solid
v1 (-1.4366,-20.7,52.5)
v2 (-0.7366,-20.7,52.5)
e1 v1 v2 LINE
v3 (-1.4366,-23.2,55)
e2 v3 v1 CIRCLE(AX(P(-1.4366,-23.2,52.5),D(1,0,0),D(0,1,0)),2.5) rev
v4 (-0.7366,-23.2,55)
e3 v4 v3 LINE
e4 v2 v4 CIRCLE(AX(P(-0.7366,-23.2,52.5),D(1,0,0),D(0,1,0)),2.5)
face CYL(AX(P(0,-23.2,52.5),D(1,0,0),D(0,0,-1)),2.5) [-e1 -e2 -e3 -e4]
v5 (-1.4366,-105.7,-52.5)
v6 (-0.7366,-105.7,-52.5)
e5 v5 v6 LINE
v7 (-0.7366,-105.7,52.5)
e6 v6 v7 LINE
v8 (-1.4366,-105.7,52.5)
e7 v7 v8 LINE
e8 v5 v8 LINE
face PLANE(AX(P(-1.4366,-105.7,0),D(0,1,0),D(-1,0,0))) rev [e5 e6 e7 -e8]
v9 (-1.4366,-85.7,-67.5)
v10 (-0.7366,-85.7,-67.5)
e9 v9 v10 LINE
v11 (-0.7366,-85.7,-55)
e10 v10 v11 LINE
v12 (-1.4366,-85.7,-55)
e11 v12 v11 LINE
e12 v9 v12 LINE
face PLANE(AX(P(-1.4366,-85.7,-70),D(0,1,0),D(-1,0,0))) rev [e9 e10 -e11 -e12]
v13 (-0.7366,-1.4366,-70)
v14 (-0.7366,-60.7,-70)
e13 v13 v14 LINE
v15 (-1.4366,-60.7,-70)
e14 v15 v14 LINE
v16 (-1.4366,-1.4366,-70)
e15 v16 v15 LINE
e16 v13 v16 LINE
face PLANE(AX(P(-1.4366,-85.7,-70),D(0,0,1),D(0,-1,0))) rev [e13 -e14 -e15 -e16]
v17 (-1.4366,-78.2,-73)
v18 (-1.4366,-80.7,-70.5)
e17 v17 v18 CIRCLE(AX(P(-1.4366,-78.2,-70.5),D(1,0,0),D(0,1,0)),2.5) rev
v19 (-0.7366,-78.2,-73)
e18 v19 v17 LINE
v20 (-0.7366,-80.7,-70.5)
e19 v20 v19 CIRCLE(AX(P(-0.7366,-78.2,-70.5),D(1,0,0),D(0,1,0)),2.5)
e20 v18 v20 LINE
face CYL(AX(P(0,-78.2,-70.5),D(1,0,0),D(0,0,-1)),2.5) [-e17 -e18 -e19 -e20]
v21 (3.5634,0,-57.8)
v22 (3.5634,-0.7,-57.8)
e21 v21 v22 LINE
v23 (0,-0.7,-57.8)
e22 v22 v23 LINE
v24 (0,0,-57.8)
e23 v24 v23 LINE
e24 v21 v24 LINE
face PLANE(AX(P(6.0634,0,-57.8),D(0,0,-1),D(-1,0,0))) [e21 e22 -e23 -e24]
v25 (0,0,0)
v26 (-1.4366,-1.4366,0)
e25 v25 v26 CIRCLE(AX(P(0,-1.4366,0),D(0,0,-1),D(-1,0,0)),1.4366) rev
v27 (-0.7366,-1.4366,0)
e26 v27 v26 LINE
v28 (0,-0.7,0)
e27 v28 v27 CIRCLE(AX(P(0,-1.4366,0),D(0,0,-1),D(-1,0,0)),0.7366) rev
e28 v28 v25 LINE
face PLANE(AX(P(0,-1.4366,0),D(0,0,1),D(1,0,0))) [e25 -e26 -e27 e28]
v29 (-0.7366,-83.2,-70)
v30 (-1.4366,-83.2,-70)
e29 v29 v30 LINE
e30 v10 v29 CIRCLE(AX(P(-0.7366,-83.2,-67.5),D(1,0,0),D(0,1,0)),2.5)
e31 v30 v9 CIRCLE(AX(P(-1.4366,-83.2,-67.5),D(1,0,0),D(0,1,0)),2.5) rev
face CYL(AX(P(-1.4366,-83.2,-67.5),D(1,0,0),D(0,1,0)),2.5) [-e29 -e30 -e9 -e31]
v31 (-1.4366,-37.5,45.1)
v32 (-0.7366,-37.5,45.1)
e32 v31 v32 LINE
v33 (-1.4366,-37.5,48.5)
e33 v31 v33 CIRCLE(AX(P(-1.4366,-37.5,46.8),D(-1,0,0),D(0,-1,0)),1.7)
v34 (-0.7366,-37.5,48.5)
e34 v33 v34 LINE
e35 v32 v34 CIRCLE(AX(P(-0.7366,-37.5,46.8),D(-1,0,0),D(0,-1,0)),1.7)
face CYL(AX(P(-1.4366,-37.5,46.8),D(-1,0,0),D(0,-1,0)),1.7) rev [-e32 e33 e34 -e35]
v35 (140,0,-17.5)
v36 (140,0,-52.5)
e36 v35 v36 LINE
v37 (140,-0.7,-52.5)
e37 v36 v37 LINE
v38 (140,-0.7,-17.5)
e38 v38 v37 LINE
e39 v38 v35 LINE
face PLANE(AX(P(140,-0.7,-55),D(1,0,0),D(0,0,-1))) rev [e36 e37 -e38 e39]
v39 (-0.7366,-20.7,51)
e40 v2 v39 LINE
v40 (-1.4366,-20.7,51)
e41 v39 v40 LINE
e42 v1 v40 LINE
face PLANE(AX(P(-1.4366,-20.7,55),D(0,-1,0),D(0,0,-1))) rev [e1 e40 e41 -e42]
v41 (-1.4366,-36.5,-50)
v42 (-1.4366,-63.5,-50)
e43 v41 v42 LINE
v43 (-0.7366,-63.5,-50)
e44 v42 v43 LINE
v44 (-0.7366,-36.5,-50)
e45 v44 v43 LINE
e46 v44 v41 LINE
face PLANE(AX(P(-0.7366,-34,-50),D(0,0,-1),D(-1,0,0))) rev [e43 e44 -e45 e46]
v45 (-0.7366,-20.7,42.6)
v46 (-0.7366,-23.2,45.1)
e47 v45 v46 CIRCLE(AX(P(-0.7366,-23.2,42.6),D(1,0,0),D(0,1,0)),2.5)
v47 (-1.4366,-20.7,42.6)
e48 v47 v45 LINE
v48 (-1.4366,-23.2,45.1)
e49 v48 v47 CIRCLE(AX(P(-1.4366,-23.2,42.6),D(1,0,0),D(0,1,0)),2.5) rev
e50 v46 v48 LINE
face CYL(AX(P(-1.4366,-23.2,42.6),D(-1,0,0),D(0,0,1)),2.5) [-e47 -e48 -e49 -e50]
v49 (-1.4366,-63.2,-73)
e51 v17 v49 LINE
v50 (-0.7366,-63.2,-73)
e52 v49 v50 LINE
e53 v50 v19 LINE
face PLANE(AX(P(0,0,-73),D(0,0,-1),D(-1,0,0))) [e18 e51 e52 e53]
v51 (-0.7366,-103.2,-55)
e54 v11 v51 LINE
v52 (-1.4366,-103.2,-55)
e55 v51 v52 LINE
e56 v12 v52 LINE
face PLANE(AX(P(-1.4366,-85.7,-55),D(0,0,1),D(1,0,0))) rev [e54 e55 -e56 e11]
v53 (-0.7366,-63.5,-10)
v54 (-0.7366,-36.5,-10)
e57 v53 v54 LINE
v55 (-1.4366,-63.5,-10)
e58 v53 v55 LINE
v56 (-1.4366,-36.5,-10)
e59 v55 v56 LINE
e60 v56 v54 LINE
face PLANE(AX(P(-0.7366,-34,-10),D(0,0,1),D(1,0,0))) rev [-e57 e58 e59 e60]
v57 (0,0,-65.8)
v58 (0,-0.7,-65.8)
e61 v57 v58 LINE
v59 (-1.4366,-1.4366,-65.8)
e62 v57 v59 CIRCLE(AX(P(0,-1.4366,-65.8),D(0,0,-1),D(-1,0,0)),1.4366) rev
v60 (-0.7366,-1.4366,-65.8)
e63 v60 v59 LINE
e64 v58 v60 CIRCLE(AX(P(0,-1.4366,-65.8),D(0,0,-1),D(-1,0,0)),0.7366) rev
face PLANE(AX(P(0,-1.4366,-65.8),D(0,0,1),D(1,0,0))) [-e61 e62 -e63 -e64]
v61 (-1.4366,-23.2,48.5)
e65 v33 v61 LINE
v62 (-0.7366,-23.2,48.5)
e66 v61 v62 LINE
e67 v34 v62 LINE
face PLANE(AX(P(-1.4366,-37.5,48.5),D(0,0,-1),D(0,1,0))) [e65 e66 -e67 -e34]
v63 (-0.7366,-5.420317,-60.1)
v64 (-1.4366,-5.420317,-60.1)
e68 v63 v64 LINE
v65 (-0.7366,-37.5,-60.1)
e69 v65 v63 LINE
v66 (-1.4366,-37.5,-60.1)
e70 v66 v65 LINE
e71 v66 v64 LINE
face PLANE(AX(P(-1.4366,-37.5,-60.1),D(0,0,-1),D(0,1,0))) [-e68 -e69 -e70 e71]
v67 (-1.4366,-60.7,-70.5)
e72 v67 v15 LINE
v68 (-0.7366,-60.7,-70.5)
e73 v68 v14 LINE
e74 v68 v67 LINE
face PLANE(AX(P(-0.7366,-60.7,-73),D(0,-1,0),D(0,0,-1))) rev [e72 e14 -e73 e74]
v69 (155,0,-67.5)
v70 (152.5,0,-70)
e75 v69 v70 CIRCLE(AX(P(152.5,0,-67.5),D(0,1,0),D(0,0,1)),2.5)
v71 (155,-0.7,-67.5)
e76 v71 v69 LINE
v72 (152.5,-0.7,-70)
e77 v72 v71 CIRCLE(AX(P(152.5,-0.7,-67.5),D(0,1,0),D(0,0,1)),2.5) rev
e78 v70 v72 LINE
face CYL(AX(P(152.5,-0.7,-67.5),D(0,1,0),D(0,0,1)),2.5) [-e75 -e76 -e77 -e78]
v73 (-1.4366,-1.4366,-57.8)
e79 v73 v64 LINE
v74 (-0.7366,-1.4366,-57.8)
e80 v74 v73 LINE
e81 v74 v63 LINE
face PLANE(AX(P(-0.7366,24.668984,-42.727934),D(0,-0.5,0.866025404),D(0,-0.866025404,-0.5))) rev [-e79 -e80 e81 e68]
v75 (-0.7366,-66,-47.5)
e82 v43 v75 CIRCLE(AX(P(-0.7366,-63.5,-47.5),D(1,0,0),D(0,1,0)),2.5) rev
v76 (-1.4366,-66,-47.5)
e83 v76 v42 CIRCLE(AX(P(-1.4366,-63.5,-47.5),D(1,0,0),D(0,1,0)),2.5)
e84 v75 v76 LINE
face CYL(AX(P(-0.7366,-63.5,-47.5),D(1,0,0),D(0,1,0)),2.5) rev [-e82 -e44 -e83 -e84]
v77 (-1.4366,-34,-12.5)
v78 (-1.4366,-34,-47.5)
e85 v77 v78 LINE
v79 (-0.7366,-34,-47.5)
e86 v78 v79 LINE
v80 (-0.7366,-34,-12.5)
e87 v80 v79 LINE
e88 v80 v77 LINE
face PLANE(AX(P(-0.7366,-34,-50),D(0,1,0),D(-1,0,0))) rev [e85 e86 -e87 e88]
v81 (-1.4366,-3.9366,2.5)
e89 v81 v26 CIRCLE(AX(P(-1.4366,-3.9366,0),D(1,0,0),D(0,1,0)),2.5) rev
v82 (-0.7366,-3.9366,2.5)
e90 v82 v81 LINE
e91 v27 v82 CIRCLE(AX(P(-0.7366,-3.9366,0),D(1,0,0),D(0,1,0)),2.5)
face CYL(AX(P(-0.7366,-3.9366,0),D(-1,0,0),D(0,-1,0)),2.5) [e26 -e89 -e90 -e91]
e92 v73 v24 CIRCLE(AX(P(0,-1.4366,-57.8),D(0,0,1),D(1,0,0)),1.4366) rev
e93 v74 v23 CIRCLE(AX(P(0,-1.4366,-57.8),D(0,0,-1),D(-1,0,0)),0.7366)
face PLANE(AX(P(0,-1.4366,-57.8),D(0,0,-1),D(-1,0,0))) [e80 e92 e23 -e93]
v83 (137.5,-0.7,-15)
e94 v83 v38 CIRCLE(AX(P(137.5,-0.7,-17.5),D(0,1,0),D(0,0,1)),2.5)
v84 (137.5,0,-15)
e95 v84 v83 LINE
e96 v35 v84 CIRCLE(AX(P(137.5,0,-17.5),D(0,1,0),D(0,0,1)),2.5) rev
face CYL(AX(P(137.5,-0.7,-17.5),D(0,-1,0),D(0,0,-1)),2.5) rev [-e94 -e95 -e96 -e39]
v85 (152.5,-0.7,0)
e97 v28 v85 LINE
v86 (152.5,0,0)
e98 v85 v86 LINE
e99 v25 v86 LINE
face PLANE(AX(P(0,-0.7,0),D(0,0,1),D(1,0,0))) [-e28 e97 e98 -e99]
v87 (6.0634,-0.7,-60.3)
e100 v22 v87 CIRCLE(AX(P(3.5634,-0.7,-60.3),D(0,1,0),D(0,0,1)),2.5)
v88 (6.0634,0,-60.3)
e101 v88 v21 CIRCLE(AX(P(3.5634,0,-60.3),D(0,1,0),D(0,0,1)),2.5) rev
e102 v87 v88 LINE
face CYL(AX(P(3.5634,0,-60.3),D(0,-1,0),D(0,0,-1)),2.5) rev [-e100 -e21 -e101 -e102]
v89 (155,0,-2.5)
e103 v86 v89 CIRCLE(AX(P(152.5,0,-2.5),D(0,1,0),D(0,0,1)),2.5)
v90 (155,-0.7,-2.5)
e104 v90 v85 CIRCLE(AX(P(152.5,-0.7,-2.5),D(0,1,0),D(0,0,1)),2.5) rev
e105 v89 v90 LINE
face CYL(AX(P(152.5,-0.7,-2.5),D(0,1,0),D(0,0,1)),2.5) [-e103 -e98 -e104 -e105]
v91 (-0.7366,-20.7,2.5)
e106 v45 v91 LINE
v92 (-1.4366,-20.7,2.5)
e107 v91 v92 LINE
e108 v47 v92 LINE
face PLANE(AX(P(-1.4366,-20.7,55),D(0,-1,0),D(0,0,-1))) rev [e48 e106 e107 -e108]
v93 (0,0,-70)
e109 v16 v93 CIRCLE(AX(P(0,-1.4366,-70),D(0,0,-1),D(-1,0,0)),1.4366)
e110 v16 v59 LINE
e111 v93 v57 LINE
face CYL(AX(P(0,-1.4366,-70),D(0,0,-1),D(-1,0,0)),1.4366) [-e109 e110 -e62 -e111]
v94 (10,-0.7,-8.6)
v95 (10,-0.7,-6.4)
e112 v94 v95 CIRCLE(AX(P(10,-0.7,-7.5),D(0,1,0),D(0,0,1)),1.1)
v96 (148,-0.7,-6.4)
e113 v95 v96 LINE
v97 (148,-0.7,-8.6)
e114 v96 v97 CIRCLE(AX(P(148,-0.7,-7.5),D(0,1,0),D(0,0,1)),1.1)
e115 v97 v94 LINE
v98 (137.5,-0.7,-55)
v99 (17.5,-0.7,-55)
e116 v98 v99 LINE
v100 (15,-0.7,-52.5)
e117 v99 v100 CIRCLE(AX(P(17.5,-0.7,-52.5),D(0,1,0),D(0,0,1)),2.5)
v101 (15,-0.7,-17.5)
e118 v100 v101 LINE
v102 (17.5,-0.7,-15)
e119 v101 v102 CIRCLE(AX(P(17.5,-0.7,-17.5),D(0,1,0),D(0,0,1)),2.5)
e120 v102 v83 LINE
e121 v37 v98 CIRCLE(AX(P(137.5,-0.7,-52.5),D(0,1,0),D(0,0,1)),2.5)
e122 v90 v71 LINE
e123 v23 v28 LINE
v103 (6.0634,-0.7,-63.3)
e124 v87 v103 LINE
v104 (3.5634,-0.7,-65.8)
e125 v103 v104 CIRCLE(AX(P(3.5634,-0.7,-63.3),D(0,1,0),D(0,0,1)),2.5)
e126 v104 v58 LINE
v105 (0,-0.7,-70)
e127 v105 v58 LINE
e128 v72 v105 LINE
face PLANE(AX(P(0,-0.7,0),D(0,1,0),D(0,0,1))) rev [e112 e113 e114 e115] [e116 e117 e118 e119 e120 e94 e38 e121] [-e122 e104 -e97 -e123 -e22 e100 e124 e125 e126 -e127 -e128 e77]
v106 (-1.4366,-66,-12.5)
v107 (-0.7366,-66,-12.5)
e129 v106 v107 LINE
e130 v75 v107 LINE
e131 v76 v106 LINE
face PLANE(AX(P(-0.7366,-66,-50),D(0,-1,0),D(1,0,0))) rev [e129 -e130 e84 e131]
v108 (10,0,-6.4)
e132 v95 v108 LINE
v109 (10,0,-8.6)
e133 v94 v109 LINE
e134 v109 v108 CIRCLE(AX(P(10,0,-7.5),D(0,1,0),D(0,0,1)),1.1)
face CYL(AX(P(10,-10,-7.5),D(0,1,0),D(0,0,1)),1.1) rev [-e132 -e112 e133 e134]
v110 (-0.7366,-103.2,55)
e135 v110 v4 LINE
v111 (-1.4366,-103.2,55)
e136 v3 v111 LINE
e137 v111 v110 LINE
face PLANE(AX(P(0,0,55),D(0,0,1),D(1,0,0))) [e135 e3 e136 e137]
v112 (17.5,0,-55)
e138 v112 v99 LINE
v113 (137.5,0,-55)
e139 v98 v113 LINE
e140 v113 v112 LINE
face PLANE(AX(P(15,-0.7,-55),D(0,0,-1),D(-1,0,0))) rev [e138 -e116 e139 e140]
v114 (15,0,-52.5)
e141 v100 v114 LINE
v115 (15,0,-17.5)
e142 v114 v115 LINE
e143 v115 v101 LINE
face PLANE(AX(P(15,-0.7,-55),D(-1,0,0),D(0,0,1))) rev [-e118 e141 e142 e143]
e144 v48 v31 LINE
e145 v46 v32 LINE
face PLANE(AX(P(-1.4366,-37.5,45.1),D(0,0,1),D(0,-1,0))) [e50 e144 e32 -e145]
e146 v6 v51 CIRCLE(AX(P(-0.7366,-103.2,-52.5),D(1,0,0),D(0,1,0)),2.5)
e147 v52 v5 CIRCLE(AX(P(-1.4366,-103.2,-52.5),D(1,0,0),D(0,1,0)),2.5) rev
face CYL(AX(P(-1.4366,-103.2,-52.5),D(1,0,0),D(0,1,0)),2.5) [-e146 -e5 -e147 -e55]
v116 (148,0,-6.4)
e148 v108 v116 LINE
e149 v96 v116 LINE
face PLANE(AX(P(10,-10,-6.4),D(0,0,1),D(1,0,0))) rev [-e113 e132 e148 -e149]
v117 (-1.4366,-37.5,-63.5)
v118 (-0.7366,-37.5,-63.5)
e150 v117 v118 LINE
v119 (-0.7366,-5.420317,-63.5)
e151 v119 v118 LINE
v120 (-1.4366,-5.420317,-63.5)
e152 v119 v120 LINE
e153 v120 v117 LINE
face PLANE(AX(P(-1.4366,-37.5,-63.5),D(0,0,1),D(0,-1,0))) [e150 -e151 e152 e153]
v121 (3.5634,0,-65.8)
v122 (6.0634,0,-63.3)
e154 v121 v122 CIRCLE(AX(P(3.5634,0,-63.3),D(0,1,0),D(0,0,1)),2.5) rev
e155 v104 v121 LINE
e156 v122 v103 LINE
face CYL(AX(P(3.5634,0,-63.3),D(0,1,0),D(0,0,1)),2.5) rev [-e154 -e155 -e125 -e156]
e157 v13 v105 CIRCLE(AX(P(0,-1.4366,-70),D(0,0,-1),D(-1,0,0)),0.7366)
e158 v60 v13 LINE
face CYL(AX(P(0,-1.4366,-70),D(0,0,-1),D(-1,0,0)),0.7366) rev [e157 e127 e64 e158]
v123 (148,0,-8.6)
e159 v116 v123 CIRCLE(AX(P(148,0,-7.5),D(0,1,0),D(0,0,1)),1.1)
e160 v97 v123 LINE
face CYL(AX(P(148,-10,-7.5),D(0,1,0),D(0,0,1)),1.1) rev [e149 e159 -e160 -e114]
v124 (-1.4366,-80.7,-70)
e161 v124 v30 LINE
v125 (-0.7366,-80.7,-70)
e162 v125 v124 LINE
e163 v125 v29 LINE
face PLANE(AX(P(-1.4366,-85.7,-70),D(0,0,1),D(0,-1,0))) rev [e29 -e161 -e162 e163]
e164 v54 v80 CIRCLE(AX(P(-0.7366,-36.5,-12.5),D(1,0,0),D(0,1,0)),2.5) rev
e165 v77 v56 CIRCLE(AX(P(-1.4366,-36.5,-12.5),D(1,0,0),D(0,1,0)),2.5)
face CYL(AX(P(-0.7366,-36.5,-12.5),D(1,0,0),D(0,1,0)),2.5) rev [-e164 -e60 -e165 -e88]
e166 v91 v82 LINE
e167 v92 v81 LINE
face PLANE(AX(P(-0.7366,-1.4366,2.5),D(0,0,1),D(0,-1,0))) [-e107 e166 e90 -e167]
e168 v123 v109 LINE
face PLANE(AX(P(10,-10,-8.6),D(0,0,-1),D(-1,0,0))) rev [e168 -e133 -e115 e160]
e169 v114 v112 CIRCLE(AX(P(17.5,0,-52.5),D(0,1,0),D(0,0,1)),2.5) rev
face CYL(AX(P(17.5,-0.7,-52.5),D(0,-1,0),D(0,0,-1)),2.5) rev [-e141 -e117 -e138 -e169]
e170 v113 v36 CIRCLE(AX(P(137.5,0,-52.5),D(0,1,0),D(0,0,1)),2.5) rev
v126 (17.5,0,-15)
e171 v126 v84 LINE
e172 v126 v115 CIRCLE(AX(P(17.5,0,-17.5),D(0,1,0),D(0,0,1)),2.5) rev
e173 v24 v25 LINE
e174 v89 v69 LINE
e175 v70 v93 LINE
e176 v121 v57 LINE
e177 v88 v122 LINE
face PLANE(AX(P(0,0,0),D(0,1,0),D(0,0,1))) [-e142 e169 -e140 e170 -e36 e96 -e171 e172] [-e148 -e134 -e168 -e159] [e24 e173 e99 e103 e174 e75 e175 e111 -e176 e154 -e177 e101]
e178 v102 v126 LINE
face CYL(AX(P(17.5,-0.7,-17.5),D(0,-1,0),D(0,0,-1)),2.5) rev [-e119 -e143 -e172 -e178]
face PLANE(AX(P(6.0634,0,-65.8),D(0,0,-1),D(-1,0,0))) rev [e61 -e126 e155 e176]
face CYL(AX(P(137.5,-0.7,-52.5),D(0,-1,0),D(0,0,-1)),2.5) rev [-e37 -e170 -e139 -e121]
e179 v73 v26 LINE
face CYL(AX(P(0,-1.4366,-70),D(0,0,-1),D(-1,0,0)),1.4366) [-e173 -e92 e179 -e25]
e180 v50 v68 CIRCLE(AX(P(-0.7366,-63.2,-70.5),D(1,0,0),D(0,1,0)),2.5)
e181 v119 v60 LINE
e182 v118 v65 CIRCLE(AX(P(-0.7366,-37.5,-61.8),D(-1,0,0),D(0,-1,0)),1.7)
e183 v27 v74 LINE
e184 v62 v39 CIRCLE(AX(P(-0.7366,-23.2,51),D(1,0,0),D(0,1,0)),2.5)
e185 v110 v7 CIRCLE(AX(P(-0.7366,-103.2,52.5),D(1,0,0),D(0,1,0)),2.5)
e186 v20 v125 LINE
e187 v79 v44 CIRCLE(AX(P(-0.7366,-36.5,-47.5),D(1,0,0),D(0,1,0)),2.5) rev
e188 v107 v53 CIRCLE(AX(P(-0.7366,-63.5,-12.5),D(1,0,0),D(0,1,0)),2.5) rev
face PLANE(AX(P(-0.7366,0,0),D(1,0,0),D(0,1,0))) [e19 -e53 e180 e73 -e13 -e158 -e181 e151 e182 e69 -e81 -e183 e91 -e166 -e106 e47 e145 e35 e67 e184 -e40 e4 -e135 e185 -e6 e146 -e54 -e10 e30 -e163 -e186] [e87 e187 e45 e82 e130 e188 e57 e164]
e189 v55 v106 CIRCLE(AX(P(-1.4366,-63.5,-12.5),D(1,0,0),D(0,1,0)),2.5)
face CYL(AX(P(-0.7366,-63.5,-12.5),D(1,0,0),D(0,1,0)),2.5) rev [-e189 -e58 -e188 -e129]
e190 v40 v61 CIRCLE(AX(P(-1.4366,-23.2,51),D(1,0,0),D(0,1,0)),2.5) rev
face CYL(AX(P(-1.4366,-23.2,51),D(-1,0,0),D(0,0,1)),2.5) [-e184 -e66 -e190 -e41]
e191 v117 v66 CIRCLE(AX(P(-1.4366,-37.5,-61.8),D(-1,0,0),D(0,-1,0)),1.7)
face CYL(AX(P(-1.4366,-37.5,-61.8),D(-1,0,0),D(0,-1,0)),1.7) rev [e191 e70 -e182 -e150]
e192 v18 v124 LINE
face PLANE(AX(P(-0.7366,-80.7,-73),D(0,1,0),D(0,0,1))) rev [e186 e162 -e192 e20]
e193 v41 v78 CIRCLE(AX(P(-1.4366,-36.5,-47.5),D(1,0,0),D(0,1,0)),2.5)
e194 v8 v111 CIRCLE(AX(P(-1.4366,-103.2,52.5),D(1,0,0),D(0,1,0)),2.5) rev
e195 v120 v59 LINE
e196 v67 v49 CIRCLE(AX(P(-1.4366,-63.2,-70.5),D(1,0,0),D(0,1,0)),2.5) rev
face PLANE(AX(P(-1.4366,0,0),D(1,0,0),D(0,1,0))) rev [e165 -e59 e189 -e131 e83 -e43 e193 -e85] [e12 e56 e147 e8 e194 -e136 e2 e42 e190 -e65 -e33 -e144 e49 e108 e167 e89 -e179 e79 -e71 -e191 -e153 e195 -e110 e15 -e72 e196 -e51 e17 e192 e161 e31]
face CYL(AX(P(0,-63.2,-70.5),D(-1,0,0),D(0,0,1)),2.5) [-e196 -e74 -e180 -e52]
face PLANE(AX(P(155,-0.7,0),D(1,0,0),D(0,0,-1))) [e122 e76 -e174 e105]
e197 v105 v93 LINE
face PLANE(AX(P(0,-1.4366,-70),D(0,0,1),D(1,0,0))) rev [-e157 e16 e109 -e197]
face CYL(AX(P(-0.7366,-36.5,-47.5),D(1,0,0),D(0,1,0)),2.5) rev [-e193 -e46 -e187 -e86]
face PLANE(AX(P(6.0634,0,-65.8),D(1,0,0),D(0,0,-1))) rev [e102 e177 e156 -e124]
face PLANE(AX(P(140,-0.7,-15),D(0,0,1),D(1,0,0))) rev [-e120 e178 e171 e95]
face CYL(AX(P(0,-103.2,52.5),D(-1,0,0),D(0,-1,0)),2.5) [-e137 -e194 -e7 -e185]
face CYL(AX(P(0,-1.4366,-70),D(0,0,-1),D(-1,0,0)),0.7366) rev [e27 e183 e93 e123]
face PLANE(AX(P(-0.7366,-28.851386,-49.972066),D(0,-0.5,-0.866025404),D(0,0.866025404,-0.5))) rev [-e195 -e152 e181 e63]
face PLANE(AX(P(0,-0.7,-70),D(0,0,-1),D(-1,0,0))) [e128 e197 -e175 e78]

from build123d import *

# Parameters (mm, degrees)
SKETCH1_W               = 125
SKETCH1_H               = 40
BASE_FLANGE1_DEPTH      = 0.7
CUT_EXTRUDE3_DEPTH      = 10
EDGE_FLANGE5_DEPTH      = 70
EDGE_FLANGE5_START      = 0.7
EDGE_FLANGE5_FLAT_DEPTH = 0.7
SKETCH26_W              = 0.7
SKETCH26_H              = 85
BOSS_EXTRUDE1_DEPTH     = 55
SKETCH27_W              = 0.7
SKETCH27_H              = 20
BOSS_EXTRUDE2_DEPTH     = 3
CUT_EXTRUDE4_START      = -63.5
CUT_EXTRUDE4_DEPTH      = 3.4
CUT_EXTRUDE4_START_2    = -1.4366
CUT_EXTRUDE4_2_DEPTH    = 0.7
SKETCH30_W              = 2.5
SKETCH30_H              = 19.2634
TAB1_DEPTH              = 0.7
BREAK_CORNER1_START     = -2
BREAK_CORNER1_DEPTH     = 2
BREAK_CORNER1_2_DEPTH   = 3
CUT_EXTRUDE5_DEPTH      = 7.5
SKETCH32_W              = 40
SKETCH32_H              = 32
CUT_EXTRUDE6_DEPTH      = 0.7
FILLET1_R               = 2.5


with BuildPart() as part:
    # Base-Flange1: sheet metal written as solids
    # Sketch1 → Base-Flange1 (new body)
    with BuildSketch(Plane(origin=(0, 0, 0), x_dir=(1, 0, 0), z_dir=(0, 1, 0))):
        Polygon((0, 0), (155, 0), (155, 70), (0, 70), (0, 55), (0, 15), align=None)
        with Locations((77.5, 35)):
            Rectangle(SKETCH1_W, SKETCH1_H, mode=Mode.SUBTRACT)
    extrude(amount=-BASE_FLANGE1_DEPTH)

    # Sketch22 → Cut-Extrude3 (cut)
    with BuildSketch(Plane(origin=(0, 0, 0), x_dir=(1, 0, 0), z_dir=(0, 1, 0))):
        with BuildLine():
            Line((10, 8.6), (148, 8.6))
            ThreePointArc((148, 8.6), (149.1, 7.5), (148, 6.4))
            Line((148, 6.4), (10, 6.4))
            ThreePointArc((10, 6.4), (8.9, 7.5), (10, 8.6))
        make_face()
    extrude(amount=-CUT_EXTRUDE3_DEPTH, mode=Mode.SUBTRACT)

    # Edge-Flange5: sheet metal written as solids
    # Edge-Flange5 bend section (on a plane across the edge) → Edge-Flange5 (add)
    with BuildSketch(Plane(origin=(-0.7366, -0.7, 0), x_dir=(1, 0, 0), z_dir=(0, 0, -1))):
        with BuildLine():
            Line((-0.7, 0.7366), (0, 0.7366))
            ThreePointArc((0, 0.7366), (0.215745145, 0.215745145), (0.7366, 0))
            Line((0.7366, 0), (0.7366, -0.7))
            ThreePointArc((0.7366, -0.7), (-0.279229602, -0.279229602), (-0.7, 0.7366))
        make_face()
    extrude(amount=EDGE_FLANGE5_DEPTH)

    # Edge-Flange5 profile (on flange) → Edge-Flange5 flat (add)
    with BuildSketch(Plane(origin=(-0.7366, -0.7, 0), x_dir=(0, 0, -1), z_dir=(-1, 0, 0)).offset(EDGE_FLANGE5_START)):
        Polygon((70, 0.7366), (70, 85), (55, 85), (55, 105), (0, 105), (0, 0.7366), align=None)
    extrude(amount=-EDGE_FLANGE5_FLAT_DEPTH)

    # Sketch26 → Boss-Extrude1 (add)
    with BuildSketch(Plane.XY):
        with Locations((-1.0866, -63.2)):
            Rectangle(SKETCH26_W, SKETCH26_H)
    extrude(amount=BOSS_EXTRUDE1_DEPTH)

    # Sketch27 → Boss-Extrude2 (add)
    with BuildSketch(Plane(origin=(0, 0, -70), x_dir=(-1, 0, 0), z_dir=(0, 0, -1))):
        with Locations((1.0866, -70.7)):
            Rectangle(SKETCH27_W, SKETCH27_H)
    extrude(amount=BOSS_EXTRUDE2_DEPTH)

    # Cut-Extrude4: read off the stored shape, not the designer's step
    # Cut-Extrude4 outline → Cut-Extrude4 (cut)
    with BuildSketch(Plane.XY.offset(CUT_EXTRUDE4_START)):
        with BuildLine():
            ThreePointArc((-0.7366, -1.4366), (-0.640617257, -1.073021825), (-0.377683113, -0.804195836))
            Line((-0.377683113, -0.804195836), (-0.7366, -0.203214415))
            ThreePointArc((-0.7366, -0.203214415), (-1.249403682, -0.727509033), (-1.4366, -1.4366))
            Line((-1.4366, -1.4366), (-1.4366, -20.7))
            Line((-1.4366, -20.7), (-0.7366, -20.7))
            Line((-0.7366, -20.7), (-0.7366, -1.4366))
        make_face()
    extrude(amount=CUT_EXTRUDE4_DEPTH, mode=Mode.SUBTRACT)

    # Cut-Extrude4 2 outline → Cut-Extrude4 2 (cut)
    with BuildSketch(Plane.YZ.offset(CUT_EXTRUDE4_START_2)):
        with BuildLine():
            Line((-20.7, -60.1), (-37.5, -60.1))
            ThreePointArc((-37.5, -60.1), (-39.2, -61.8), (-37.5, -63.5))
            Line((-37.5, -63.5), (-20.7, -63.5))
            Line((-20.7, -63.5), (-20.7, -60.1))
        make_face()
        with BuildLine():
            Line((-20.7, 48.5), (-37.5, 48.5))
            ThreePointArc((-37.5, 48.5), (-39.2, 46.8), (-37.5, 45.1))
            Line((-37.5, 45.1), (-20.7, 45.1))
            Line((-20.7, 45.1), (-20.7, 48.5))
        make_face()
    extrude(amount=CUT_EXTRUDE4_2_DEPTH, mode=Mode.SUBTRACT)

    # Tab1: sheet metal written as solids
    # Sketch30 → Tab1 (add)
    with BuildSketch(Plane.ZY.offset(1.4366)):
        with Locations((1.25, -11.0683)):
            Rectangle(SKETCH30_W, SKETCH30_H)
    extrude(amount=-TAB1_DEPTH)

    # Break-Corner1: read off the stored shape, not the designer's step
    # Break-Corner1 outline → Break-Corner1 (cut)
    with BuildSketch(Plane.YZ.offset(BREAK_CORNER1_START)):
        with BuildLine():
            Line((-105.7, 55), (-105.7, 52.5))
            ThreePointArc((-105.7, 52.5), (-104.967766953, 54.267766953), (-103.2, 55))
            Line((-103.2, 55), (-105.7, 55))
        make_face()
        with BuildLine():
            ThreePointArc((-60.7, -70.5), (-61.432233047, -72.267766953), (-63.2, -73))
            Line((-63.2, -73), (-60.7, -73))
            Line((-60.7, -73), (-60.7, -70.5))
        make_face()
        with BuildLine():
            ThreePointArc((-78.2, -73), (-79.967766953, -72.267766953), (-80.7, -70.5))
            Line((-80.7, -70.5), (-80.7, -73))
            Line((-80.7, -73), (-78.2, -73))
        make_face()
        with BuildLine():
            ThreePointArc((-83.2, -70), (-84.967766953, -69.267766953), (-85.7, -67.5))
            Line((-85.7, -67.5), (-85.7, -70))
            Line((-85.7, -70), (-83.2, -70))
        make_face()
        with BuildLine():
            ThreePointArc((-103.2, -55), (-104.967766953, -54.267766953), (-105.7, -52.5))
            Line((-105.7, -52.5), (-105.7, -55))
            Line((-105.7, -55), (-103.2, -55))
        make_face()
        with BuildLine():
            Line((-20.7, 48.5), (-20.7, 51))
            ThreePointArc((-20.7, 51), (-21.432233047, 49.232233047), (-23.2, 48.5))
            Line((-23.2, 48.5), (-20.7, 48.5))
        make_face()
        with BuildLine():
            Line((-20.7, 55), (-23.2, 55))
            ThreePointArc((-23.2, 55), (-21.432233047, 54.267766953), (-20.7, 52.5))
            Line((-20.7, 52.5), (-20.7, 55))
        make_face()
        with BuildLine():
            Line((-20.7, 45.1), (-23.2, 45.1))
            ThreePointArc((-23.2, 45.1), (-21.432233047, 44.367766953), (-20.7, 42.6))
            Line((-20.7, 42.6), (-20.7, 45.1))
        make_face()
        with BuildLine():
            Line((-1.4366, 2.5), (-3.9366, 2.5))
            ThreePointArc((-3.9366, 2.5), (-2.168833047, 1.767766953), (-1.4366, 0))
            Line((-1.4366, 0), (-1.4366, 2.5))
        make_face()
    extrude(amount=BREAK_CORNER1_DEPTH, mode=Mode.SUBTRACT)

    # Break-Corner1 2 outline → Break-Corner1 2 (cut)
    with BuildSketch(Plane(origin=(0, 0, 0), x_dir=(1, 0, 0), z_dir=(0, 1, 0)).offset(BREAK_CORNER1_START)):
        with BuildLine():
            Line((155, 0), (155, 2.5))
            ThreePointArc((155, 2.5), (154.267766953, 0.732233047), (152.5, 0))
            Line((152.5, 0), (155, 0))
        make_face()
        with BuildLine():
            ThreePointArc((152.5, 70), (154.267766953, 69.267766953), (155, 67.5))
            Line((155, 67.5), (155, 70))
            Line((155, 70), (152.5, 70))
        make_face()
    extrude(amount=BREAK_CORNER1_2_DEPTH, mode=Mode.SUBTRACT)

    # Sketch31 → Cut-Extrude5 (cut)
    with BuildSketch(Plane.ZY.offset(1.4366)):
        Polygon((-60.1, -5.420316857), (-63.5, -5.420316857), (-65.8, -1.4366), (-65.8, 0), (-57.8, 0), (-57.8, -1.4366), align=None)
    extrude(amount=-CUT_EXTRUDE5_DEPTH, mode=Mode.SUBTRACT)

    # Sketch32 → Cut-Extrude6 (cut)
    with BuildSketch(Plane.ZY.offset(1.4366)):
        with Locations((-30, -50)):
            Rectangle(SKETCH32_W, SKETCH32_H)
    extrude(amount=-CUT_EXTRUDE6_DEPTH, mode=Mode.SUBTRACT)

    # Fillet1
    fillet1_edges = [part.edges().sort_by_distance(p)[0] for p in [
        (15, -0.35, -55),
        (140, -0.35, -55),
        (140, -0.35, -15),
        (15, -0.35, -15),
        (6.0634, -0.35, -57.8),
        (6.0634, -0.35, -65.8),
        (-1.0866, -34, -10),
        (-1.0866, -66, -10),
        (-1.0866, -66, -50),
        (-1.0866, -34, -50),
    ]]
    fillet(fillet1_edges, radius=FILLET1_R)


solid = part.part
